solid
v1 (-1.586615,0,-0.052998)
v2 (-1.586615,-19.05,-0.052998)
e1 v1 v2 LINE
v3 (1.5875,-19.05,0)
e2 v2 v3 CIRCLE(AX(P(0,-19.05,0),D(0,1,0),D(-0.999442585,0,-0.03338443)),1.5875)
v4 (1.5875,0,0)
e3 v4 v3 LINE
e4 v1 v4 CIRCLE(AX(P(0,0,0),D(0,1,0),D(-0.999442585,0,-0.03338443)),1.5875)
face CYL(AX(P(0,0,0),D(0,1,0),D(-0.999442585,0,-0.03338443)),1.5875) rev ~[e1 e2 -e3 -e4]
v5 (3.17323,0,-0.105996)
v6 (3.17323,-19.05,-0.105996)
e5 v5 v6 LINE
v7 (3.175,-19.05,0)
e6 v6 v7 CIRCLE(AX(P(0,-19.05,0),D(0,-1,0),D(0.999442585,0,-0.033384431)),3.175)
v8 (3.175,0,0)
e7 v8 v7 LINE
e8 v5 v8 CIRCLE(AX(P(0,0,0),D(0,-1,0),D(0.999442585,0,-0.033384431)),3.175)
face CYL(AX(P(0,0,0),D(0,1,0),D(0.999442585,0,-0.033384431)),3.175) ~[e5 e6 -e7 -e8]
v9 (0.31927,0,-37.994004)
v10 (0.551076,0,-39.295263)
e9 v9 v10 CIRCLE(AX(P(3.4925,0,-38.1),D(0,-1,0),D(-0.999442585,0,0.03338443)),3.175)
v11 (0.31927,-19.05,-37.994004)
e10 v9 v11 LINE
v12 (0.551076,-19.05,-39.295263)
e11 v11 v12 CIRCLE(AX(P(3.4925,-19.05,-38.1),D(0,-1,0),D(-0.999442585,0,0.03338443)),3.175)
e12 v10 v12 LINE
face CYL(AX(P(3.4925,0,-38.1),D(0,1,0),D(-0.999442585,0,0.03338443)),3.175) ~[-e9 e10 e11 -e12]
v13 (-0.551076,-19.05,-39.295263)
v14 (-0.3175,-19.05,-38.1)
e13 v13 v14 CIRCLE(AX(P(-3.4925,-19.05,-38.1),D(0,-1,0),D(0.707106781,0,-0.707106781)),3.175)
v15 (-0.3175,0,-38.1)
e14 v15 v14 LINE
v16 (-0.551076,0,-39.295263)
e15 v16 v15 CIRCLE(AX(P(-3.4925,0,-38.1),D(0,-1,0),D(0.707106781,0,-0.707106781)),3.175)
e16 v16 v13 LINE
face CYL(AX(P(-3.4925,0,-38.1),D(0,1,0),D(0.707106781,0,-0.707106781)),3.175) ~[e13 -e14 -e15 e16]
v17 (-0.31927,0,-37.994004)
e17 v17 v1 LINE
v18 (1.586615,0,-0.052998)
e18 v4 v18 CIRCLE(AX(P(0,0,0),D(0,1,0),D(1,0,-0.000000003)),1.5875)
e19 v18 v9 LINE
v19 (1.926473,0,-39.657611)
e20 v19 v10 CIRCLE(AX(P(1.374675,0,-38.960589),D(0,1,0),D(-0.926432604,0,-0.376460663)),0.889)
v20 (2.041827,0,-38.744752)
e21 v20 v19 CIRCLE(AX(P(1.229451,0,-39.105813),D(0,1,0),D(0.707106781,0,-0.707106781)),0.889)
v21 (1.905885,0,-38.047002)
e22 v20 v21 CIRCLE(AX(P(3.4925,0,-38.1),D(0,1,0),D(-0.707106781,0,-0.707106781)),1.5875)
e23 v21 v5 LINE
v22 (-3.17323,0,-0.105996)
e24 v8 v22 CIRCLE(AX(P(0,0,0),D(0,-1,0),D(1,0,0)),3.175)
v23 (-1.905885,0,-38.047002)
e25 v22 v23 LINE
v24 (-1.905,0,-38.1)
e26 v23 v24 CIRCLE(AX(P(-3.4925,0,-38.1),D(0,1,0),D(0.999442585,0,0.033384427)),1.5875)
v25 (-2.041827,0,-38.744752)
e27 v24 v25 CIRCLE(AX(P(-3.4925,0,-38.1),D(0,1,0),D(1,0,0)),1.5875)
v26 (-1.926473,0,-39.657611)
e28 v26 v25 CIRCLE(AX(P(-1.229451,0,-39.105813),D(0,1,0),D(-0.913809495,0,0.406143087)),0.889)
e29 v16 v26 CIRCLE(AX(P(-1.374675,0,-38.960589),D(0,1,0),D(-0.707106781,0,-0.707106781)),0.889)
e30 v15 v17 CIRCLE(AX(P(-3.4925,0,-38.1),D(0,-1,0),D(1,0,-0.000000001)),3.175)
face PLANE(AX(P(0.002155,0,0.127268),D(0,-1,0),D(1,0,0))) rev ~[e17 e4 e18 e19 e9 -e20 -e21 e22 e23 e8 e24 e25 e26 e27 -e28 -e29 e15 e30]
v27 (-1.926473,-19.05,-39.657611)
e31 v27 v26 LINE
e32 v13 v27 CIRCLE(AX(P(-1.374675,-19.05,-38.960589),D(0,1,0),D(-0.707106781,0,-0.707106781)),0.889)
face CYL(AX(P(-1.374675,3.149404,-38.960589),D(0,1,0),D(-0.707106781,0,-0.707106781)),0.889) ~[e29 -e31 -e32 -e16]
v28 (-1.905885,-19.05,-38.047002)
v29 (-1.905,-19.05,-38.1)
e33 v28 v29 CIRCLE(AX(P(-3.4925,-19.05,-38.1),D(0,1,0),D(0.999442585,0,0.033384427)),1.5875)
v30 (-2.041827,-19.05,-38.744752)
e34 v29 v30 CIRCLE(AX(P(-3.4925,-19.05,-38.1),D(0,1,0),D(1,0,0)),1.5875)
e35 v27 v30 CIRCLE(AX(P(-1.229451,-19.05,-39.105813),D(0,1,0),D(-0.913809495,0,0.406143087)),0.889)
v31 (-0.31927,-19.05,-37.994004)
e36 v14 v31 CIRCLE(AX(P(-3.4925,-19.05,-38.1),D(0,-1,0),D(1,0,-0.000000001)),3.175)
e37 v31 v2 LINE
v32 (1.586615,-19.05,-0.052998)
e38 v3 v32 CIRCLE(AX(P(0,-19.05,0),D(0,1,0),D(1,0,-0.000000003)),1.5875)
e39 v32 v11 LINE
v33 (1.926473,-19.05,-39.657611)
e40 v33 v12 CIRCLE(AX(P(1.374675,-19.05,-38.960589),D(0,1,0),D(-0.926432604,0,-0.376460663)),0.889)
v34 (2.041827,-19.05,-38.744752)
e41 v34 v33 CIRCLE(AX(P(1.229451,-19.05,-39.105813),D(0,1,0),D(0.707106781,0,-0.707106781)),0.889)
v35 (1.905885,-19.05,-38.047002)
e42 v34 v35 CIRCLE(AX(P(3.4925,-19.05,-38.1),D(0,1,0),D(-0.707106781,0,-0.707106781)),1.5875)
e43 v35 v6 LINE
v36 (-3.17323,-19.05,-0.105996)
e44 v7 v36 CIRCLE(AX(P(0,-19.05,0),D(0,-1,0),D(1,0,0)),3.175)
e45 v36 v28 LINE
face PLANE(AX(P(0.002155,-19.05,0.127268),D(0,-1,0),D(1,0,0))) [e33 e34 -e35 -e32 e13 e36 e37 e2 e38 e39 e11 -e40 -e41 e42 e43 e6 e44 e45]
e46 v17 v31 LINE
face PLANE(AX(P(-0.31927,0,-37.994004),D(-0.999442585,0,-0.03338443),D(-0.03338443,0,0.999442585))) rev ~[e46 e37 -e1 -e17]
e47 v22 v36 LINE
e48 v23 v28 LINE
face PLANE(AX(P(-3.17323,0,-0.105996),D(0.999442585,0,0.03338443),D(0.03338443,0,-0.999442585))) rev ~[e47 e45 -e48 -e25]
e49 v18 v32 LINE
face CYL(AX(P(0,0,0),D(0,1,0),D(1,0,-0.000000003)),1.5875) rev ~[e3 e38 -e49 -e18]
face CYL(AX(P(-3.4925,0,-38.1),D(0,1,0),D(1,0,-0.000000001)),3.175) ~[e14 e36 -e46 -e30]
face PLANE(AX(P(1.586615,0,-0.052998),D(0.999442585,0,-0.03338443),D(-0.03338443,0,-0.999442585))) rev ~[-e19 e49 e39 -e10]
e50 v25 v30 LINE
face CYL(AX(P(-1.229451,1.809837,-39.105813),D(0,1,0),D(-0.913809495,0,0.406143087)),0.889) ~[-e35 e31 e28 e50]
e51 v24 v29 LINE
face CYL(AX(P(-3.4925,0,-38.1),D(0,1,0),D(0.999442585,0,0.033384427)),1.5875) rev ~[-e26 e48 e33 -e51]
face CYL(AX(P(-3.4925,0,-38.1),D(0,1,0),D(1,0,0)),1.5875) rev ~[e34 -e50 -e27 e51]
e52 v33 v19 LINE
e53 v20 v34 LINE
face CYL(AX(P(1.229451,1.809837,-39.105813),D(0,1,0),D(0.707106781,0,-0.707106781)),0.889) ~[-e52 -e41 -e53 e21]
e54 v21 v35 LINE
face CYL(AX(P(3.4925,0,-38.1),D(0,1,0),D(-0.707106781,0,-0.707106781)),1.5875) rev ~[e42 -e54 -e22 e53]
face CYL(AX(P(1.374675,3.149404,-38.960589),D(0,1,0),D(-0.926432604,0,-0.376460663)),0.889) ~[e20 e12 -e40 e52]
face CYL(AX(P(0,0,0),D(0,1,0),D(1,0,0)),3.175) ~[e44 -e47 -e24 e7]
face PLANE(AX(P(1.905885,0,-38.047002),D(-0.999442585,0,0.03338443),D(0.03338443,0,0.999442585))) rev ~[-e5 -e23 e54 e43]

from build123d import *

# Parameters (mm, degrees)
F1_DEPTH    = 19.05
F2_T1_DEPTH = 22.6696744492
F2_T3_DEPTH = 25.3488085544


# Not quite as in the source:
# - a fillet or chamfer that OpenCascade refuses, or shapes differently, is made with other operations: its cross-section is extruded or revolved along the edge and cut away or added


with BuildPart() as f1:
    # F0 (on Front) → F1 (new body)
    with BuildSketch(Plane.XZ):
        with BuildLine():
            ThreePointArc((-1.586615103, -0.0529977822), (-0.0265025846, 1.5872787603), (1.5875, 0))
            ThreePointArc((1.5875, 0), (1.5872787603, -0.0265025846), (1.586615103, -0.0529977822))
            Line((1.586615103, -0.0529977822), (1.4948202515, -2.8010957527))
            ThreePointArc((1.4948202515, -2.8010957527), (2.6951001882, -1.6784099545), (3.173230206, -0.1059955644))
            ThreePointArc((3.173230206, -0.1059955644), (3.1745575207, -0.0530051692), (3.175, 0))
            ThreePointArc((3.175, 0), (-0.0530051692, 3.1745575207), (-3.173230206, -0.1059955644))
            ThreePointArc((-3.173230206, -0.1059955644), (-2.6951001882, -1.6784099545), (-1.4948202515, -2.8010957527))
            Line((-1.4948202515, -2.8010957527), (-1.586615103, -0.0529977822))
        make_face()
        with BuildLine():
            Line((-0.319269794, -37.9940044356), (-1.4948202515, -2.8010957527))
            ThreePointArc((-1.4948202515, -2.8010957527), (-2.6951001882, -1.6784099545), (-3.173230206, -0.1059955644))
            Line((-3.173230206, -0.1059955644), (-1.9976797485, -35.2989042473))
            ThreePointArc((-1.9976797485, -35.2989042473), (-0.7973998118, -36.4215900455), (-0.319269794, -37.9940044356))
        make_face()
        with BuildLine():
            ThreePointArc((3.173230206, -0.1059955644), (2.6951001882, -1.6784099545), (1.4948202515, -2.8010957527))
            Line((1.4948202515, -2.8010957527), (0.319269794, -37.9940044356))
            ThreePointArc((0.319269794, -37.9940044356), (0.7973998118, -36.4215900455), (1.9976797485, -35.2989042473))
            Line((1.9976797485, -35.2989042473), (3.173230206, -0.1059955644))
        make_face()
        with BuildLine():
            ThreePointArc((-0.3175, -38.1), (-0.3179424793, -38.0469948308), (-0.319269794, -37.9940044356))
            ThreePointArc((-0.319269794, -37.9940044356), (-0.7973998118, -36.4215900455), (-1.9976797485, -35.2989042473))
            Line((-1.9976797485, -35.2989042473), (-1.905884897, -38.0470022178))
            ThreePointArc((-1.905884897, -38.0470022178), (-1.9052212397, -38.0734974154), (-1.905, -38.1))
            ThreePointArc((-1.905, -38.1), (-2.0258412421, -38.7075099489), (-2.3699679849, -39.2225320151))
            Line((-2.3699679849, -39.2225320151), (-1.2474359697, -40.3450640303))
            ThreePointArc((-1.2474359697, -40.3450640303), (-0.5591824843, -39.3150198978), (-0.3175, -38.1))
        make_face()
        with BuildLine():
            ThreePointArc((1.9976797485, -35.2989042473), (0.7973998118, -36.4215900455), (0.319269794, -37.9940044356))
            ThreePointArc((0.319269794, -37.9940044356), (0.5393070818, -39.2658801773), (1.2474359697, -40.3450640303))
            Line((1.2474359697, -40.3450640303), (2.3699679849, -39.2225320151))
            ThreePointArc((2.3699679849, -39.2225320151), (2.0159035409, -38.6829400886), (1.905884897, -38.0470022178))
            Line((1.905884897, -38.0470022178), (1.9976797485, -35.2989042473))
        make_face()
    extrude(amount=F1_DEPTH)

    # F2: fillet of radius 0.889 on 4 edges, made by hand

    # F2_s2 → F2_t1 (cut)
    with BuildSketch(Plane.XZ.offset(-1.8098372246)):
        with BuildLine():
            ThreePointArc((-2.0418274273, -38.7447521515), (-2.1035117306, -39.2681046567), (-1.8580687151, -39.7344312849))
            Line((-1.8580687151, -39.7344312849), (-2.3699679849, -39.2225320151))
            ThreePointArc((-2.3699679849, -39.2225320151), (-2.1839076792, -38.9987448959), (-2.0418274273, -38.7447521515))
        make_face()
        with BuildLine():
            ThreePointArc((1.8580687151, -39.7344312849), (2.1035117306, -39.2681046567), (2.0418274273, -38.7447521515))
            ThreePointArc((2.0418274273, -38.7447521515), (2.1839076792, -38.9987448959), (2.3699679849, -39.2225320151))
            Line((2.3699679849, -39.2225320151), (1.8580687151, -39.7344312849))
        make_face()
    extrude(amount=F2_T1_DEPTH, mode=Mode.SUBTRACT)

    # F2_s4 → F2_t3 (cut)
    with BuildSketch(Plane.XZ.offset(-3.1494042772)):
        with BuildLine():
            ThreePointArc((-2.0032929963, -39.5892070037), (-1.1983084283, -39.8319189832), (-0.551076483, -39.2952626045))
            ThreePointArc((-0.551076483, -39.2952626045), (-0.8466666667, -39.8550472849), (-1.2474359697, -40.3450640303))
            Line((-1.2474359697, -40.3450640303), (-2.0032929963, -39.5892070037))
        make_face()
        with BuildLine():
            ThreePointArc((0.551076483, -39.2952626045), (1.1983084283, -39.8319189832), (2.0032929963, -39.5892070037))
            Line((2.0032929963, -39.5892070037), (1.2474359697, -40.3450640303))
            ThreePointArc((1.2474359697, -40.3450640303), (0.8466666667, -39.8550472849), (0.551076483, -39.2952626045))
        make_face()
    extrude(amount=F2_T3_DEPTH, mode=Mode.SUBTRACT)


solid = f1.part
